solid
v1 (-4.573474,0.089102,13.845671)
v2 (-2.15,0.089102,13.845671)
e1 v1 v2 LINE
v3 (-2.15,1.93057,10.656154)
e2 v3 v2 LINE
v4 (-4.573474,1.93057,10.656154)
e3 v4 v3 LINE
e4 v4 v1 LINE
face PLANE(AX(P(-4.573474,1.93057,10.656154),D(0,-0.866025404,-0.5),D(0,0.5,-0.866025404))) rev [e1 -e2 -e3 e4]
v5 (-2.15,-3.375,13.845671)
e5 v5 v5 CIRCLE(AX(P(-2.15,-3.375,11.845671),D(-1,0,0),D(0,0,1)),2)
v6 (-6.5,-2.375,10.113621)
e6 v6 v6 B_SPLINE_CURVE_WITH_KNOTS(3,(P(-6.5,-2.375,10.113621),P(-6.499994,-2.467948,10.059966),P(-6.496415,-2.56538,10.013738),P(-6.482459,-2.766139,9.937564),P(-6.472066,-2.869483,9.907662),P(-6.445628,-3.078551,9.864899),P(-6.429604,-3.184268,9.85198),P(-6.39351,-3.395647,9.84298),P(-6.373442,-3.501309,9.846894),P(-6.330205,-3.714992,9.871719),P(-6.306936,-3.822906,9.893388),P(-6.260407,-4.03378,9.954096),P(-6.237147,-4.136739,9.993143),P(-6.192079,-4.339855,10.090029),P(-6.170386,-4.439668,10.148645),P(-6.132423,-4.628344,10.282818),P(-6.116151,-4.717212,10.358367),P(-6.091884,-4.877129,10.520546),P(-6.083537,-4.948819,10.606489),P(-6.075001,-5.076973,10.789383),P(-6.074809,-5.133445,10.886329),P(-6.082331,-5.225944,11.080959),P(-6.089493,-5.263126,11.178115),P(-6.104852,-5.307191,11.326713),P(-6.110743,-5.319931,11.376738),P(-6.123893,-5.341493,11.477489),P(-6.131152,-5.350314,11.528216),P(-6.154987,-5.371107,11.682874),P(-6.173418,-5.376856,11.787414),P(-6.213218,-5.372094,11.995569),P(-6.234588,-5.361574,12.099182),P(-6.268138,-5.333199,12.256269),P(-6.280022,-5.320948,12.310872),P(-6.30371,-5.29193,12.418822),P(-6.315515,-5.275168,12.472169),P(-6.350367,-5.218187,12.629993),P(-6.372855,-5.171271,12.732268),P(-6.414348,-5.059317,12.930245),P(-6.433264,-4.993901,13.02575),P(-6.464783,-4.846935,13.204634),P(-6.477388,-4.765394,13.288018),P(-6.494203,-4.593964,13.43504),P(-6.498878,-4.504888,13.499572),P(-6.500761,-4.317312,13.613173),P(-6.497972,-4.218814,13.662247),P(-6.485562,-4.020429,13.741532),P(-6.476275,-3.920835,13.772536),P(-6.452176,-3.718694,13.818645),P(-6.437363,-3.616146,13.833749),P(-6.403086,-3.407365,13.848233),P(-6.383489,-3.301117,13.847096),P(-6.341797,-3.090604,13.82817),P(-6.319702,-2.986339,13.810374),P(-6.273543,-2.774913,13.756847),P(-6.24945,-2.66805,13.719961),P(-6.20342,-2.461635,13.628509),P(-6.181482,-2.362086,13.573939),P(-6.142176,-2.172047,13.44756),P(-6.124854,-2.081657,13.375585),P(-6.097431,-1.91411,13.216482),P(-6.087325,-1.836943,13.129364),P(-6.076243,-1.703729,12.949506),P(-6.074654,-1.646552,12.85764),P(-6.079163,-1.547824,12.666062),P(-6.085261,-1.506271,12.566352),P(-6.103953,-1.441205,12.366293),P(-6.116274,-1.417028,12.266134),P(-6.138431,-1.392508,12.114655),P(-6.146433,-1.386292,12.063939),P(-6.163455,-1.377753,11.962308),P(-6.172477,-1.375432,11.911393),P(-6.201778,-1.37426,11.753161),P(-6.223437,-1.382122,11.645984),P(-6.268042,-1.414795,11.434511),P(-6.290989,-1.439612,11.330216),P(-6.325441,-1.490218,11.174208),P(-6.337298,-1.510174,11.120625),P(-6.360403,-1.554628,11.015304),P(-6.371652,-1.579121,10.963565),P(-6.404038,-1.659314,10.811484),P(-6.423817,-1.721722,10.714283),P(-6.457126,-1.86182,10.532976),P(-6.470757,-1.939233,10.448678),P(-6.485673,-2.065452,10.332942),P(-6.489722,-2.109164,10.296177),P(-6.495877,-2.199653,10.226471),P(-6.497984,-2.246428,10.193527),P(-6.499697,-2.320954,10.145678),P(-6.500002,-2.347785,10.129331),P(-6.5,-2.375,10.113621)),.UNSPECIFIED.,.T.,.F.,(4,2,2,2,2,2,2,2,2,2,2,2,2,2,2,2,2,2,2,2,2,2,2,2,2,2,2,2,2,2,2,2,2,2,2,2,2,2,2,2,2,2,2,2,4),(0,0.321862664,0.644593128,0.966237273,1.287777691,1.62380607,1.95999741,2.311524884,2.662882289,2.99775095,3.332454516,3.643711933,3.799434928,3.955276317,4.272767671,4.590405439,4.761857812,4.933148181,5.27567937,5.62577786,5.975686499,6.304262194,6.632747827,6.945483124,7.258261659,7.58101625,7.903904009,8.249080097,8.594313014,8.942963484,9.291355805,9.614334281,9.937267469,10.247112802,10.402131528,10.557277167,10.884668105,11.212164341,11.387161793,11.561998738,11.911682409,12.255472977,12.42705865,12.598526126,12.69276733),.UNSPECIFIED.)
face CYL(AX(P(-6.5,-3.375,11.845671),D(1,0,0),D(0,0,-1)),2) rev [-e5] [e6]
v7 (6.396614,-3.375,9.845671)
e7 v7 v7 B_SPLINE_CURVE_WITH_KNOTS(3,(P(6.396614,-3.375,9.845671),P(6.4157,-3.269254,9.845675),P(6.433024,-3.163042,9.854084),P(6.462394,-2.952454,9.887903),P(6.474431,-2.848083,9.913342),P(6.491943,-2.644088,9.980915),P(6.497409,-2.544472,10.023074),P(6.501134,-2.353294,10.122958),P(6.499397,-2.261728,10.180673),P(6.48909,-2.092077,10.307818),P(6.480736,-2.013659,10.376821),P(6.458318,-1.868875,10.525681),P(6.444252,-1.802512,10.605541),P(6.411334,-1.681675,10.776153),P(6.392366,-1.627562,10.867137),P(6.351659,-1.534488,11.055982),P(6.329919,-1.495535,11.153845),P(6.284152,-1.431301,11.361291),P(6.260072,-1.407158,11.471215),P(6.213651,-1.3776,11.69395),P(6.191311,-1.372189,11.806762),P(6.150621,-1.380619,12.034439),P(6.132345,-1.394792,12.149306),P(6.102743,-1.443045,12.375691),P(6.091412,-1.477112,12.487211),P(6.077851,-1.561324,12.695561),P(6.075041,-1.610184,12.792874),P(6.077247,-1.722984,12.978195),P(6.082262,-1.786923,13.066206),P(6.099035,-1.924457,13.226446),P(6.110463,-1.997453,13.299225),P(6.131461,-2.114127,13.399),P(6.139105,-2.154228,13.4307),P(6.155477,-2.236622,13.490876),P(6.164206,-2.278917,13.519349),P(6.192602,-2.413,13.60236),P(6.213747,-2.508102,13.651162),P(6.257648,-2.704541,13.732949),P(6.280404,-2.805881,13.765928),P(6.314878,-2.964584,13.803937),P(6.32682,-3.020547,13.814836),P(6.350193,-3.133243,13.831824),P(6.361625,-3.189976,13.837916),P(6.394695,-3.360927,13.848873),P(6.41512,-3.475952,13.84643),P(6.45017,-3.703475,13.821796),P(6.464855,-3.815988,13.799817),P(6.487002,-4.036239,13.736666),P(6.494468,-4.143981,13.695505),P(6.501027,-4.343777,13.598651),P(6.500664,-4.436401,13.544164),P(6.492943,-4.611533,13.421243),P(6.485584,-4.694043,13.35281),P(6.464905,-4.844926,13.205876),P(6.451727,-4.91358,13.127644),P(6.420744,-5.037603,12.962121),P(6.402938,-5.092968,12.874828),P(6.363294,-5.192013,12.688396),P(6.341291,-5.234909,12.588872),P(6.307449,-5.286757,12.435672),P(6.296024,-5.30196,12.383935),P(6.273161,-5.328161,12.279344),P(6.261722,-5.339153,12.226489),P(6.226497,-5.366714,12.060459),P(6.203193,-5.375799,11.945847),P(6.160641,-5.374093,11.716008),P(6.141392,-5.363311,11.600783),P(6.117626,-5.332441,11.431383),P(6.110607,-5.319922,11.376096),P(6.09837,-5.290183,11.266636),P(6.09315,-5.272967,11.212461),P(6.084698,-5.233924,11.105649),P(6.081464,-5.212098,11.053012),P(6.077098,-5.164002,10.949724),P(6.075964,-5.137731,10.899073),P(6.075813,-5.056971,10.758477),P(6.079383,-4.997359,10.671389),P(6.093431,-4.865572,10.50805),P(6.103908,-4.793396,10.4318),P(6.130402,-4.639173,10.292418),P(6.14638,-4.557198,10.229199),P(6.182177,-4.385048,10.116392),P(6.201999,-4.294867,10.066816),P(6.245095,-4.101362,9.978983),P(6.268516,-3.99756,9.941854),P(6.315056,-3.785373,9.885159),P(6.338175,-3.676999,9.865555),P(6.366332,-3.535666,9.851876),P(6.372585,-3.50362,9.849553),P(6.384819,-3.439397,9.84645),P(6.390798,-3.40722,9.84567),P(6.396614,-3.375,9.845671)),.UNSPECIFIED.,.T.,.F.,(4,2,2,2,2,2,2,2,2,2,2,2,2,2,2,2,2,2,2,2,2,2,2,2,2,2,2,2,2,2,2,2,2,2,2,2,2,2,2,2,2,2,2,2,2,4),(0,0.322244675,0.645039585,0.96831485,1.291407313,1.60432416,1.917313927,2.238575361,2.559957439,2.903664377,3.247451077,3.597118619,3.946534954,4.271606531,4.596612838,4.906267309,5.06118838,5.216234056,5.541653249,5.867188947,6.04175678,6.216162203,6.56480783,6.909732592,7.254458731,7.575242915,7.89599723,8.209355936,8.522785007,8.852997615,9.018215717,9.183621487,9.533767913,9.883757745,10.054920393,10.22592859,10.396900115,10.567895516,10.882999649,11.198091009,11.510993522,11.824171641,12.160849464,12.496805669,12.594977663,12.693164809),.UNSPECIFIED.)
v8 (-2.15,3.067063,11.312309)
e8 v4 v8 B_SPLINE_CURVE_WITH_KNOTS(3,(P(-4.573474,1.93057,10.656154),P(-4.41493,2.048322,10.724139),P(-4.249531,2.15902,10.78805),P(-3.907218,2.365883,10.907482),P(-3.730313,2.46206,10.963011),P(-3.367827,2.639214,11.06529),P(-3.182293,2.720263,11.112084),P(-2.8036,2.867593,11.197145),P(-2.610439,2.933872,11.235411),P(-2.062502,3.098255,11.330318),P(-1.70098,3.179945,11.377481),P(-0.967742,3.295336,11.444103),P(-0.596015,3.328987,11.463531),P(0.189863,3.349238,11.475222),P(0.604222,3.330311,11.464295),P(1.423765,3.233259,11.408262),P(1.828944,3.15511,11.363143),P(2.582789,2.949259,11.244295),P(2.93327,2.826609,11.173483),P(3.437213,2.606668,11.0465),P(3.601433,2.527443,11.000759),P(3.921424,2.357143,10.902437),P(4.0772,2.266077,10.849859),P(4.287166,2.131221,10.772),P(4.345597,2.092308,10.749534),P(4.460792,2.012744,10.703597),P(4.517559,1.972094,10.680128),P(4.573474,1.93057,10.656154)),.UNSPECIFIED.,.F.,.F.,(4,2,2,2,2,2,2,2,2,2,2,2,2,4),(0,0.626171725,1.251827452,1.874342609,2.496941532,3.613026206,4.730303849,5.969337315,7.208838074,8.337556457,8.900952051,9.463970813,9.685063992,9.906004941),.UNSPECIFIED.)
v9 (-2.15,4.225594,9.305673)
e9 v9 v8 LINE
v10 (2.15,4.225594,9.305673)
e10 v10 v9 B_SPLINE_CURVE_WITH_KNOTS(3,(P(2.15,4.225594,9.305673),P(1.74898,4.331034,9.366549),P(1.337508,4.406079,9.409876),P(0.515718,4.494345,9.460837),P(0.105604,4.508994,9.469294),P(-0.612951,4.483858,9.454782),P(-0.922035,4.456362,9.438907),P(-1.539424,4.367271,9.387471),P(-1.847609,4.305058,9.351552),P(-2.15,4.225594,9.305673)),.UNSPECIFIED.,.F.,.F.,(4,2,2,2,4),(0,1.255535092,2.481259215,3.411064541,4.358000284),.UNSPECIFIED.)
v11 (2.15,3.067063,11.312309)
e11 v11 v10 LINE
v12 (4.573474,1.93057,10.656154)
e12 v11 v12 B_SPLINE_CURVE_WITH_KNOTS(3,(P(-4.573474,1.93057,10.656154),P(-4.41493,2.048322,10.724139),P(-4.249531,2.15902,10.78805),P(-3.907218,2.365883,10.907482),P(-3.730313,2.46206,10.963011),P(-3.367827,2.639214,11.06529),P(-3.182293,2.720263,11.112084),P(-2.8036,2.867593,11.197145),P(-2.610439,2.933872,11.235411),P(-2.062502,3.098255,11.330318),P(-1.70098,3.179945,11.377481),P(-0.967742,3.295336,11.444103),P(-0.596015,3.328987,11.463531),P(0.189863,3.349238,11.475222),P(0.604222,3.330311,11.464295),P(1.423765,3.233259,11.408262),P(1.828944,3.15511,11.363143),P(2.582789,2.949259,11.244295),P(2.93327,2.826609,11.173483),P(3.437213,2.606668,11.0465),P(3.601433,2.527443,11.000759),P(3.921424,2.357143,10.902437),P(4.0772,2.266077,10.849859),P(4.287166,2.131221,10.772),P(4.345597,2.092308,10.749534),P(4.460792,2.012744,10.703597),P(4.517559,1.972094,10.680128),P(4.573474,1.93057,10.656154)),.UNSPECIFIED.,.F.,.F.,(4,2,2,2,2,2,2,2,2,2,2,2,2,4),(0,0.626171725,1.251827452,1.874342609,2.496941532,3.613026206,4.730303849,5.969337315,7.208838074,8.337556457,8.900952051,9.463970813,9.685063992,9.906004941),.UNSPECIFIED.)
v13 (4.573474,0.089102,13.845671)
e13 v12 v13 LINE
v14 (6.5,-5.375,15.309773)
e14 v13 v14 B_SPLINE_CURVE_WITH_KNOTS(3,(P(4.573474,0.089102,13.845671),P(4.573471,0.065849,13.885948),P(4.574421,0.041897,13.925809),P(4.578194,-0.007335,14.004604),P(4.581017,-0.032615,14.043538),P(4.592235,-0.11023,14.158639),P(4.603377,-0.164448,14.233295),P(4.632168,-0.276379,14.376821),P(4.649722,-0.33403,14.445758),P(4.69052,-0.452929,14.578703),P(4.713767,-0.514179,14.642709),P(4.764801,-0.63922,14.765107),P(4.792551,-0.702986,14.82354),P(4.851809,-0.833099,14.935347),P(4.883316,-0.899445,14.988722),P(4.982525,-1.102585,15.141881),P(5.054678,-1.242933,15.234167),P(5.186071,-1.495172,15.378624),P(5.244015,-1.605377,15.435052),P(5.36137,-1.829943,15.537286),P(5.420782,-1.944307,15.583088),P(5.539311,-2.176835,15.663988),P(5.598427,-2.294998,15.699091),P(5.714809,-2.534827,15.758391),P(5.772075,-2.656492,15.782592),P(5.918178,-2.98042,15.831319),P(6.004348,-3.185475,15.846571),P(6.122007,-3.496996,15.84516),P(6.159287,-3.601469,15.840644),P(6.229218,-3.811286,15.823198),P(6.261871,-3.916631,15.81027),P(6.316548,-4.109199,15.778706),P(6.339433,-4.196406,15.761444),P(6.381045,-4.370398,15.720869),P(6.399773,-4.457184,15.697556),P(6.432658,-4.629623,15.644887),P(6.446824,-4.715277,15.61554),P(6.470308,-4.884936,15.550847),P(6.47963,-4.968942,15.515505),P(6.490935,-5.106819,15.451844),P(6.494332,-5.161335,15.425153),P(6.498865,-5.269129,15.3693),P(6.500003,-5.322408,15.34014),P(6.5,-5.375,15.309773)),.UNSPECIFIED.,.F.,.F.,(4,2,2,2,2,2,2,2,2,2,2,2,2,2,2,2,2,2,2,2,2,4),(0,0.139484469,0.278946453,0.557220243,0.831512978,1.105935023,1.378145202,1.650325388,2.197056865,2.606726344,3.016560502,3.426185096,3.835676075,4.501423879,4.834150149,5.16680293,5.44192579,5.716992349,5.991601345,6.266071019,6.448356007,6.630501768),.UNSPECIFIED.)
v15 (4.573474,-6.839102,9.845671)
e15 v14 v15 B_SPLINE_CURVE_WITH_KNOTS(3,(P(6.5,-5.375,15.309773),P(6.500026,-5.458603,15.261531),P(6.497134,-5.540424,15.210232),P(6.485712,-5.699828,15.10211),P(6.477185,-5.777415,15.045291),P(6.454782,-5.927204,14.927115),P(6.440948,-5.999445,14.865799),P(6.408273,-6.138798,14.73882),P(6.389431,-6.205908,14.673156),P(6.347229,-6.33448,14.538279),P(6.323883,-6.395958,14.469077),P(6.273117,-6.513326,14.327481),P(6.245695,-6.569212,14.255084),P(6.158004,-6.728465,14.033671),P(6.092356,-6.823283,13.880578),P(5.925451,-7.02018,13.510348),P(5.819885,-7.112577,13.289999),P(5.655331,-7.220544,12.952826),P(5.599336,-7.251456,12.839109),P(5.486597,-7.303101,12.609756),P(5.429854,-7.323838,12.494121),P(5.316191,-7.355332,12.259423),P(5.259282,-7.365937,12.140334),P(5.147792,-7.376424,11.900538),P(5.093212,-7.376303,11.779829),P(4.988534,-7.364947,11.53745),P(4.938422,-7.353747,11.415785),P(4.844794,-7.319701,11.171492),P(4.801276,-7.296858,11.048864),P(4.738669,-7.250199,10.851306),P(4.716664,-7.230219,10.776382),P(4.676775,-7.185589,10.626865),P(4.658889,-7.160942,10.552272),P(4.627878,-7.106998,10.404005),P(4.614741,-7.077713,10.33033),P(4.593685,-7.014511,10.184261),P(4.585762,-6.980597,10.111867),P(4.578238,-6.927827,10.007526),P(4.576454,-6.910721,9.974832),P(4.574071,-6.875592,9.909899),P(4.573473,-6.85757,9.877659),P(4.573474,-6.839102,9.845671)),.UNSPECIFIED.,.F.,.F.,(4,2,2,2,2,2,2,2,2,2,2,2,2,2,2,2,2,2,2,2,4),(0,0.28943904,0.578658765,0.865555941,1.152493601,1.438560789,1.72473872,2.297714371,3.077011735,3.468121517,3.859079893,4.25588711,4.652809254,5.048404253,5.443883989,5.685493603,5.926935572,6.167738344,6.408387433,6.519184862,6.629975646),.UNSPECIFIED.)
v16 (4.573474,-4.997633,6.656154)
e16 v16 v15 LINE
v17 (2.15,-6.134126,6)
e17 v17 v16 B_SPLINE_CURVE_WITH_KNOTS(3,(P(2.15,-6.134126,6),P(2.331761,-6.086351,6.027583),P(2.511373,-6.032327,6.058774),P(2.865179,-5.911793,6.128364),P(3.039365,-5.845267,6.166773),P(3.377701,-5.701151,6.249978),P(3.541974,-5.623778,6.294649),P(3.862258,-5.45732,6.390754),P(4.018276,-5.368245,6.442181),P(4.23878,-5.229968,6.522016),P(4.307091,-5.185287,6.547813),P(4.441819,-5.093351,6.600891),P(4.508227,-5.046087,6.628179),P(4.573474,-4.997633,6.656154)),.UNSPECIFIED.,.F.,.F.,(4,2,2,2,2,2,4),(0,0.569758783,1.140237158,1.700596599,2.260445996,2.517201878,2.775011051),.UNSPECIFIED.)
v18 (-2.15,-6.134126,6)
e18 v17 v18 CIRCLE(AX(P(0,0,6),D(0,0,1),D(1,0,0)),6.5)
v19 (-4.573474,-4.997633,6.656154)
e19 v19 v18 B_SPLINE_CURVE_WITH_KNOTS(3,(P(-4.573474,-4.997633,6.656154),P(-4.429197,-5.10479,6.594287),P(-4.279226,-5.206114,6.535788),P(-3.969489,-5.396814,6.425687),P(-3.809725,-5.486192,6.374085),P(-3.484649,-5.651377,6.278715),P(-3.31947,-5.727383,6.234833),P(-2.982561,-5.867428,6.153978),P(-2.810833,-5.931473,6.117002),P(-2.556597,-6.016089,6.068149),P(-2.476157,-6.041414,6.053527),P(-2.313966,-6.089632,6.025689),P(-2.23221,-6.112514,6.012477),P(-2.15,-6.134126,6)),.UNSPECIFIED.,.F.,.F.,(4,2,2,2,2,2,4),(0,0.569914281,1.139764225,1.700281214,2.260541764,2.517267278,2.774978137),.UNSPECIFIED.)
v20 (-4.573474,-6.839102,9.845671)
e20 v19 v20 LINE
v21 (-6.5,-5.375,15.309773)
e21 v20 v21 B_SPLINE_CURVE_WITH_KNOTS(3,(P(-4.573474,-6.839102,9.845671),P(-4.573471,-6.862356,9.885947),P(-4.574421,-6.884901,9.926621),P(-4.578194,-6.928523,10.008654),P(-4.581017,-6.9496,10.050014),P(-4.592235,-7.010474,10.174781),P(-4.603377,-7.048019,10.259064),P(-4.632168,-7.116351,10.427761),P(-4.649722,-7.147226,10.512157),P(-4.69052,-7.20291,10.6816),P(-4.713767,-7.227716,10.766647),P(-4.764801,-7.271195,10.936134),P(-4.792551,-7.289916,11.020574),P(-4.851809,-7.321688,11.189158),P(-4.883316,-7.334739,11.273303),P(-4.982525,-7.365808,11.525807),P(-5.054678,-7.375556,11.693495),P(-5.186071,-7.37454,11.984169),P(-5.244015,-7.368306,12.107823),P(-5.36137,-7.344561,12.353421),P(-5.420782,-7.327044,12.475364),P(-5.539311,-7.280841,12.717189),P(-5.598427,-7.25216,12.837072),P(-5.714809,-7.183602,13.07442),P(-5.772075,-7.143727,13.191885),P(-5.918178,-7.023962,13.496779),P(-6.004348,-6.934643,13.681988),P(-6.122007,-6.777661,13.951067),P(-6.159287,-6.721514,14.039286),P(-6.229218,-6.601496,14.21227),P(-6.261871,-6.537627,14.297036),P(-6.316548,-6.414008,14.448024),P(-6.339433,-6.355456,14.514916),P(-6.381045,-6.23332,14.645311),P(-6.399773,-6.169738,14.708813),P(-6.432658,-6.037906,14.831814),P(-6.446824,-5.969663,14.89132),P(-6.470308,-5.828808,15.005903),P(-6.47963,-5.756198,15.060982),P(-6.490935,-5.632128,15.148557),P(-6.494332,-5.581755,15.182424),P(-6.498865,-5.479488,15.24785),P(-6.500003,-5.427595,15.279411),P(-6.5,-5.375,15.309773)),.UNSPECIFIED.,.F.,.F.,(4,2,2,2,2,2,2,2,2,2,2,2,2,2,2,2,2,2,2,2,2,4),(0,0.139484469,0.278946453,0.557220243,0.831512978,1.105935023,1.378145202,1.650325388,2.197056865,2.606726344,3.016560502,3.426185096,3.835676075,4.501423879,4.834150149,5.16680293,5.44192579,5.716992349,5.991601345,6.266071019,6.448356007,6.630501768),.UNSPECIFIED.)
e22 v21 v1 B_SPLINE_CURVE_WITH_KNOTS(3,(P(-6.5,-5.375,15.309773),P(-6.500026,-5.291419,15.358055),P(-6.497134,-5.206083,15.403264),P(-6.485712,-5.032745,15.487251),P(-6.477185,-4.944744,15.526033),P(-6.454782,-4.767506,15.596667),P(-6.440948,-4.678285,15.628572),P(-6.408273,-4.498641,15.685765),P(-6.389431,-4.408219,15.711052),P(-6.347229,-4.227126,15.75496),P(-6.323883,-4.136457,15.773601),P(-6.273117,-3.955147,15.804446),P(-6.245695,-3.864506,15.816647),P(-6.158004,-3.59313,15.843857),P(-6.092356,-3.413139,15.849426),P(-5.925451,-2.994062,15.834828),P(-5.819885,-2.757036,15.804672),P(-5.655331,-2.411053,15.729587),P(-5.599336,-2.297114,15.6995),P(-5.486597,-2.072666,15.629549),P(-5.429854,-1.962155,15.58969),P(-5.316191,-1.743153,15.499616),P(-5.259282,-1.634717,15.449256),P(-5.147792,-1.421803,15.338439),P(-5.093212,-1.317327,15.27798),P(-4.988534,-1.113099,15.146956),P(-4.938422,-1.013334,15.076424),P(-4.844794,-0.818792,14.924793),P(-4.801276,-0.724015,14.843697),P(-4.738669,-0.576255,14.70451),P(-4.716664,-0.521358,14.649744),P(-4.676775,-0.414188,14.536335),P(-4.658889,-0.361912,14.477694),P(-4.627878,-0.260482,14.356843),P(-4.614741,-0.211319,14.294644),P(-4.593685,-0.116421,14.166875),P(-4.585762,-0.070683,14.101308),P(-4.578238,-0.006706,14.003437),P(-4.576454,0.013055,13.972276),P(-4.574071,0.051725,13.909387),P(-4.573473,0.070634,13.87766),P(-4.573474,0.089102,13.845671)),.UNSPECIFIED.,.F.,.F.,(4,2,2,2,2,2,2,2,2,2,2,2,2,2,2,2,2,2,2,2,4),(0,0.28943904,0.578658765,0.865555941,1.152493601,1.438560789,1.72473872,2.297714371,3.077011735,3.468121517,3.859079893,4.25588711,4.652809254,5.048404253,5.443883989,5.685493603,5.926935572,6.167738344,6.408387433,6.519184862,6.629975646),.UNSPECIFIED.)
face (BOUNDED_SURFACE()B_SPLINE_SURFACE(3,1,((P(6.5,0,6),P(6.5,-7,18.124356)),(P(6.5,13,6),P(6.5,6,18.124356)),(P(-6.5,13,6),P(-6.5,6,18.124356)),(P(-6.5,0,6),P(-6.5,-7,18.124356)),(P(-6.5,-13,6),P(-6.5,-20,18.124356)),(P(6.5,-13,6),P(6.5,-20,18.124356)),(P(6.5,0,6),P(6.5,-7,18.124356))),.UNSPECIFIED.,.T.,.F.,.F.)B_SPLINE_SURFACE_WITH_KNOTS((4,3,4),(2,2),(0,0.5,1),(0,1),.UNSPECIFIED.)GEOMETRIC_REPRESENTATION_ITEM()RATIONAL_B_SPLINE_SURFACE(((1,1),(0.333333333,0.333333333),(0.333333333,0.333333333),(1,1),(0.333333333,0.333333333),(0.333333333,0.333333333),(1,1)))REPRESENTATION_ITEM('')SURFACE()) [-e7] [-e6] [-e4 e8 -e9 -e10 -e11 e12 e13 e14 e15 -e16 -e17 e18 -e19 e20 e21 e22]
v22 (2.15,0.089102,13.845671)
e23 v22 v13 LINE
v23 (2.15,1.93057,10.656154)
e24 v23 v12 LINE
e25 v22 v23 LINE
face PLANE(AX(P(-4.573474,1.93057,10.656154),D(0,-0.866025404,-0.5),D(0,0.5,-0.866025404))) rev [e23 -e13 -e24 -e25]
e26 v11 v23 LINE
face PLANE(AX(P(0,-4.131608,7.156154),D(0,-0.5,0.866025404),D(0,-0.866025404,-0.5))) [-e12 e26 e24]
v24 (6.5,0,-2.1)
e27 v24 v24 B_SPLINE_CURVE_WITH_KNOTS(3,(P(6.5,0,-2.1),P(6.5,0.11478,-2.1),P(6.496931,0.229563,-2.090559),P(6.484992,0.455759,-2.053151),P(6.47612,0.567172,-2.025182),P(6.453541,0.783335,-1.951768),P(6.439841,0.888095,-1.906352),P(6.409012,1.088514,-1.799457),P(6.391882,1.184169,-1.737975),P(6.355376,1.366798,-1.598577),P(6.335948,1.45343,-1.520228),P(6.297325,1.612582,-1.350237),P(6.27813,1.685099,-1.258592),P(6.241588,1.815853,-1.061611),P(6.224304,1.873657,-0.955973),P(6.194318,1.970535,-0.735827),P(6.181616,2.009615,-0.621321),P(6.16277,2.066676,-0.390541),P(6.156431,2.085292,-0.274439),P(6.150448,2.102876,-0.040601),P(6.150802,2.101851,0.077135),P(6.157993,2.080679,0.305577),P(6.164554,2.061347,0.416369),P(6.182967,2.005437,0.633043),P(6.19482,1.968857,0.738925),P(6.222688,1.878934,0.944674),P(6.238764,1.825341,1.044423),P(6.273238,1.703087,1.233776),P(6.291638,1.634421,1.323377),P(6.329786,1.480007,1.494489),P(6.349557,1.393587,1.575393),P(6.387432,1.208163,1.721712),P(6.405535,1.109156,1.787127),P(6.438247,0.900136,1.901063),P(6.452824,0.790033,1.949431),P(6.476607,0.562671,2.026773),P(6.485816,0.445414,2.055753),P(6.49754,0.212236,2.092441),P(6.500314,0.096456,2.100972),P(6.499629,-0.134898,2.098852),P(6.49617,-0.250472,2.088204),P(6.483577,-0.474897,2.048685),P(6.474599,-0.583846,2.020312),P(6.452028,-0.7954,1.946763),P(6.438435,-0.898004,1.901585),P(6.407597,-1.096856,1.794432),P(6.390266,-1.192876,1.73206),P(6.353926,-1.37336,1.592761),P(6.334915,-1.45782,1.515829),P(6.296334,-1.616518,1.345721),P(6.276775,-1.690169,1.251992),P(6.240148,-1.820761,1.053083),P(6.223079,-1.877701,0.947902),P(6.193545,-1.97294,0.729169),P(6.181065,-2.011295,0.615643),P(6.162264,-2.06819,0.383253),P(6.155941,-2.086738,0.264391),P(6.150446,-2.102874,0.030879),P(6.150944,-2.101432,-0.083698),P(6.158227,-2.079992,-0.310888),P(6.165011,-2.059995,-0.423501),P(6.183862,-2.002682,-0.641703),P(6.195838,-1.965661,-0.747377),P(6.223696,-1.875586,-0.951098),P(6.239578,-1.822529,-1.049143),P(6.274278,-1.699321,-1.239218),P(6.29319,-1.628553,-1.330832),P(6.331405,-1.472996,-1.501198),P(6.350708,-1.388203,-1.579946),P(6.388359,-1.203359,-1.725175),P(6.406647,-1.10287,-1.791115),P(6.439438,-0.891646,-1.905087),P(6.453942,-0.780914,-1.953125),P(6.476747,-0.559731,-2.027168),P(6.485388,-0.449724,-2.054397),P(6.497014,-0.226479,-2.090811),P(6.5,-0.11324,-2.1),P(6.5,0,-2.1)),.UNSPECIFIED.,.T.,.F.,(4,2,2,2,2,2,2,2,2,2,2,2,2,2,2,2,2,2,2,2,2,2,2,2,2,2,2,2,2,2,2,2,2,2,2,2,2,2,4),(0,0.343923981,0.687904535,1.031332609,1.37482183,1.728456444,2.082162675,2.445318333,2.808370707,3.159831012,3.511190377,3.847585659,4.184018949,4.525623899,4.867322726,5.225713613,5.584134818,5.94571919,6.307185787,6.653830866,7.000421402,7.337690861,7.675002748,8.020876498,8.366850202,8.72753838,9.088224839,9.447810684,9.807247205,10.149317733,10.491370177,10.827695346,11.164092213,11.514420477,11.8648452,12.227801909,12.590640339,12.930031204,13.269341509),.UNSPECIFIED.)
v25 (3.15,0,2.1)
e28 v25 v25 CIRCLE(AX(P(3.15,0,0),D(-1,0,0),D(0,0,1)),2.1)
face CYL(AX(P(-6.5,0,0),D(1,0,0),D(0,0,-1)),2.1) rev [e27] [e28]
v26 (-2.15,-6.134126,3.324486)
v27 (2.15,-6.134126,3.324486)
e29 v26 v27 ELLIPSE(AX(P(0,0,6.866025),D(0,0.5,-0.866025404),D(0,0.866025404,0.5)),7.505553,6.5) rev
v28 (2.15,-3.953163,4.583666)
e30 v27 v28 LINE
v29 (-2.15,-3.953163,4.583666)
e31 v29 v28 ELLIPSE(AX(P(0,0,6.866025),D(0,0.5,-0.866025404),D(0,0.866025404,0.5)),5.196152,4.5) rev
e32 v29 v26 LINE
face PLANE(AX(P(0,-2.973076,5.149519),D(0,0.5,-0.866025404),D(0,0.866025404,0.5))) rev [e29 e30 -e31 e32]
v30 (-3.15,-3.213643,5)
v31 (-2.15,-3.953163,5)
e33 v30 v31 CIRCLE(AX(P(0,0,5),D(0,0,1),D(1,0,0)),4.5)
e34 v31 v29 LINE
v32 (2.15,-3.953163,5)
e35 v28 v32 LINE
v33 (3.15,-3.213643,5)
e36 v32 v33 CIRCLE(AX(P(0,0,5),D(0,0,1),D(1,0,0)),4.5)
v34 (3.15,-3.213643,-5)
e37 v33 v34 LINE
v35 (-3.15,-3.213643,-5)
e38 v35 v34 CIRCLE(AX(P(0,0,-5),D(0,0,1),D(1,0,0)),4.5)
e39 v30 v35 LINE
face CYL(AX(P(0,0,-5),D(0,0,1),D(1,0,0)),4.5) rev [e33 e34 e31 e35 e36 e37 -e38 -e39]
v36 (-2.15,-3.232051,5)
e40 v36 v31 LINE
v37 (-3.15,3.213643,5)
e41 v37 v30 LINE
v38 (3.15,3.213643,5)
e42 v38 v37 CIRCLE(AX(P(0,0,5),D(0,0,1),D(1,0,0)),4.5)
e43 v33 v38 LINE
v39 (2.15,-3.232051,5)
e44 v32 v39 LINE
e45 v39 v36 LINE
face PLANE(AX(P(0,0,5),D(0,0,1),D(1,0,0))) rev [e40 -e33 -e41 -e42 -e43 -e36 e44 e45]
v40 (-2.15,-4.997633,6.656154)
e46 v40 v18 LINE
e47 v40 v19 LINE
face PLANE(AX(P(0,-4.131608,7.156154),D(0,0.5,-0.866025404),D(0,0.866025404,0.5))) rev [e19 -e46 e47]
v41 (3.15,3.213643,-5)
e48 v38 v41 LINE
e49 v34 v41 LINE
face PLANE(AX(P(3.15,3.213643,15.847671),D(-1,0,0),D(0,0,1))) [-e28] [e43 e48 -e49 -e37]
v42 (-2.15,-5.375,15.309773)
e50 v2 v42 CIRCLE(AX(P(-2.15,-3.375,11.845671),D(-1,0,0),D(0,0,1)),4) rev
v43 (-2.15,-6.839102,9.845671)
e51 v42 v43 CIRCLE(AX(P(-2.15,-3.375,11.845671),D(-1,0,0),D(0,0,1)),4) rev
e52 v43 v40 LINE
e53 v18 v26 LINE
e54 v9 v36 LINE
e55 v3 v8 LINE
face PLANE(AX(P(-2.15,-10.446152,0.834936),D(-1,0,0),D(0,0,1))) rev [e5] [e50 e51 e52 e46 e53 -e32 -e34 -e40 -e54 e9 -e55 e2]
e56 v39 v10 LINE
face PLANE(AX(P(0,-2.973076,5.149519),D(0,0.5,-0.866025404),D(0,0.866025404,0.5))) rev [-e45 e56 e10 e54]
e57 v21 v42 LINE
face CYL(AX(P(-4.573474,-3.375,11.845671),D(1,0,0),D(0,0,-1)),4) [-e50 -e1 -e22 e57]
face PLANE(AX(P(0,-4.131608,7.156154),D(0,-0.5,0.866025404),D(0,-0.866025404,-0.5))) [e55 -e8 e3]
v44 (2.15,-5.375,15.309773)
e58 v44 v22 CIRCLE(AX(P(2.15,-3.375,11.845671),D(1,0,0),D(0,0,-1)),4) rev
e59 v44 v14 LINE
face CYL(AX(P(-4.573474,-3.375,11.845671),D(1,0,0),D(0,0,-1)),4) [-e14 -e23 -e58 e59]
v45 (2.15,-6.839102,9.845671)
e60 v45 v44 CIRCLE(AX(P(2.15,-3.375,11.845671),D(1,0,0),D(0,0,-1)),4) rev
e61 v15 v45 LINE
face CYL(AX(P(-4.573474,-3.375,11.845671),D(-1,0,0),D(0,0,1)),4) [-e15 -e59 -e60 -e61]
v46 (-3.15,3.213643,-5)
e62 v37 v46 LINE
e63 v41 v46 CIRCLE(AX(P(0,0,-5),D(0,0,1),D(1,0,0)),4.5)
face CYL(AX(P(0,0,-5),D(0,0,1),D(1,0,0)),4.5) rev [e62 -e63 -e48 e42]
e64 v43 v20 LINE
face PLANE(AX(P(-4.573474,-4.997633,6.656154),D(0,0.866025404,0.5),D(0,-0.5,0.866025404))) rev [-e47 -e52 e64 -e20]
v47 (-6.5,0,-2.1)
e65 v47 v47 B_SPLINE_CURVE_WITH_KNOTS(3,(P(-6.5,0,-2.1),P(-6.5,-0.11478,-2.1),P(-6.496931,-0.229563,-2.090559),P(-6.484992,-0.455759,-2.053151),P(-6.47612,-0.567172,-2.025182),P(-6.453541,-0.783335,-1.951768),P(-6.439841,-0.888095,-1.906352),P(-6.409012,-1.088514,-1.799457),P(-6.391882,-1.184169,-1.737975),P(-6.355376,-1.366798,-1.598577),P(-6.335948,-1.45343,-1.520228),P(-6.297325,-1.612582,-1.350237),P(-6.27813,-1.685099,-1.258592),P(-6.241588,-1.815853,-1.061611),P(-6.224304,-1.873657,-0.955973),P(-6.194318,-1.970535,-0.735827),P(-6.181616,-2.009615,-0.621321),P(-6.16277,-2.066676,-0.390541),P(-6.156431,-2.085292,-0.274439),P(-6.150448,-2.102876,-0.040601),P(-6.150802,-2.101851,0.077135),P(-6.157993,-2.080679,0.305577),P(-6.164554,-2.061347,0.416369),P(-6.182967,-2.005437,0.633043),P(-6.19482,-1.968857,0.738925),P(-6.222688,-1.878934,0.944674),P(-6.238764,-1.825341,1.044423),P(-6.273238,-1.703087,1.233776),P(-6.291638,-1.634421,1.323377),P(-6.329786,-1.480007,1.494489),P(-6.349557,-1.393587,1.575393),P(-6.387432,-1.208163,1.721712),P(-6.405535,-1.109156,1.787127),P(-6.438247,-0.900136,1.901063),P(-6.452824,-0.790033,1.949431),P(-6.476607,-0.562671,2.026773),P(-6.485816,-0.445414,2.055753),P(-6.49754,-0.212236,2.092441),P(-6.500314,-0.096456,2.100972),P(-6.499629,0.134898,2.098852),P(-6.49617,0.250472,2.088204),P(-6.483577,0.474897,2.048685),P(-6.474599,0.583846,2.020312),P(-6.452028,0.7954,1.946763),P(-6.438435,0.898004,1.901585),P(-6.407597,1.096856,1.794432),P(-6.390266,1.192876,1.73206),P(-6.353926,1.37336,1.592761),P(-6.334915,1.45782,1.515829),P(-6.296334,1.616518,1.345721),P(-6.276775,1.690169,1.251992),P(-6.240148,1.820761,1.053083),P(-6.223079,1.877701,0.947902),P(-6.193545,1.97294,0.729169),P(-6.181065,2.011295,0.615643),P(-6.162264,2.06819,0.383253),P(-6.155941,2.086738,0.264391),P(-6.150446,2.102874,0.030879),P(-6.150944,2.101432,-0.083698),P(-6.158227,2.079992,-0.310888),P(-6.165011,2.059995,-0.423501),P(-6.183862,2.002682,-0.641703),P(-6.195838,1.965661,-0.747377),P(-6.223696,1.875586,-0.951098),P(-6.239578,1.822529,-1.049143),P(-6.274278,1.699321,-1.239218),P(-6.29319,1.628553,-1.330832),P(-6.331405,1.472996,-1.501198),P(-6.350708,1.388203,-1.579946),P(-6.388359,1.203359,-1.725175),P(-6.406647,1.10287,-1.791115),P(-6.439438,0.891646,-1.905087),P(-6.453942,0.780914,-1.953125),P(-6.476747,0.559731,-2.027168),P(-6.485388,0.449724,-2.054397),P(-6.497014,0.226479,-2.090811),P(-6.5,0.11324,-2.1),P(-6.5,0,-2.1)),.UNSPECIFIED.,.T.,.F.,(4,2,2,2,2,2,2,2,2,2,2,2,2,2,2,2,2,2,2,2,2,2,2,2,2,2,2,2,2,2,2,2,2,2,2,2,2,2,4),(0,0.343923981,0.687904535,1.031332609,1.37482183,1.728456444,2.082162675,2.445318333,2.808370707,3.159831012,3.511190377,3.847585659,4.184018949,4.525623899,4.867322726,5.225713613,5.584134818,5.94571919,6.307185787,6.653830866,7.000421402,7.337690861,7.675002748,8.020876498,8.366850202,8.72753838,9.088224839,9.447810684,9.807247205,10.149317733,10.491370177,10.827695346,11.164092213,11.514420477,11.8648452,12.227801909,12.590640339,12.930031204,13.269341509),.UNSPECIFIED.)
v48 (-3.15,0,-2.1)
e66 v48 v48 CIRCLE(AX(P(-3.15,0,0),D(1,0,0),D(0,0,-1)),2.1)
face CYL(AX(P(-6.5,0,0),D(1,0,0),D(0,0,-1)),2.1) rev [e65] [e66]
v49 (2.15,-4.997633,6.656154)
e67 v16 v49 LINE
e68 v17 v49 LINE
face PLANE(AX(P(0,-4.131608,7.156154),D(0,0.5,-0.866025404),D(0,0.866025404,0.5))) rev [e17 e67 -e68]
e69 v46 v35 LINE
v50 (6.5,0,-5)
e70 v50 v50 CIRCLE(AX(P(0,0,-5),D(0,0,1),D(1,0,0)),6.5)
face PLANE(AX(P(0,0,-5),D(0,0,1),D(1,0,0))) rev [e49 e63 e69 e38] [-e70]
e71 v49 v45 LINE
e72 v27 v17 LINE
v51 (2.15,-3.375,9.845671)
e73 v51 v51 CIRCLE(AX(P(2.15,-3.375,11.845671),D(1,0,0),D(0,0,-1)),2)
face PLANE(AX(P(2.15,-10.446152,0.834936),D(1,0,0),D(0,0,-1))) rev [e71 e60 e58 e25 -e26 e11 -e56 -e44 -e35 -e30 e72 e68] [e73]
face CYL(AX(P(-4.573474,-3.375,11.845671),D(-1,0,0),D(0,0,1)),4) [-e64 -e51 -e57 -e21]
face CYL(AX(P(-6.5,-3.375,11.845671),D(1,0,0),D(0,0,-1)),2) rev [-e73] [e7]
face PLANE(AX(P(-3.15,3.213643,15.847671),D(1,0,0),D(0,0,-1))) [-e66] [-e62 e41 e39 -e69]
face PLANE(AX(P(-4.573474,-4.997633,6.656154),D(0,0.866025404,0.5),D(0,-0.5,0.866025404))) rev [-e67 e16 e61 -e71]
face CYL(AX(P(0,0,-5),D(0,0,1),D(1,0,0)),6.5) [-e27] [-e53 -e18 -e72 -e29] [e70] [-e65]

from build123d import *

# Parameters (mm, degrees)
BOSS_EXTRUDE1_DEPTH      = 5
BOSS_EXTRUDE1_DEPTH_BACK = 5
SKETCH1_R                = 6.5
SKETCH1_R_2              = 4.5
SKETCH2_R                = 6.5
BOSS_EXTRUDE2_DEPTH      = 1
CUT_EXTRUDE1_START       = -8
CUT_EXTRUDE1_DEPTH       = 15
SKETCH6_W                = 4.3
SKETCH6_H                = 17.25833025
CUT_EXTRUDE2_DEPTH       = 10
CUT_EXTRUDE3_DEPTH       = 22.553121401
CUT_EXTRUDE3_DEPTH_BACK  = 22.553121401
SKETCH7_R                = 2
SKETCH8_W                = 9.14694849
SKETCH8_H                = 3.258330249
CUT_EXTRUDE4_DEPTH       = 7.682935
FILLET2_R                = 4
BOSS_EXTRUDE4_REACH      = 25.047
CUT_EXTRUDE5_DEPTH       = 19.647410958
CUT_EXTRUDE5_DEPTH_BACK  = 19.647410958
SKETCH10_R               = 2.1


with BuildPart() as part:
    # Sketch1 → Boss-Extrude1 (new, two sides: drawn at the far end of the back side and taken through both)
    with BuildSketch(Plane.XY.offset(-BOSS_EXTRUDE1_DEPTH_BACK)):
        Circle(SKETCH1_R)
        Circle(SKETCH1_R_2, mode=Mode.SUBTRACT)
    extrude(amount=BOSS_EXTRUDE1_DEPTH + BOSS_EXTRUDE1_DEPTH_BACK)

    # Sketch2 → Boss-Extrude2 (add)
    with BuildSketch(Plane.XY.offset(5)):
        Circle(SKETCH2_R)
    extrude(amount=BOSS_EXTRUDE2_DEPTH)

    # Sweep1: read off the stored shape, not the designer's step
    # Sweep1: loft between two sections, ruled curve by curve
    sweep1_from = [
        Edge.make_bspline([(6.5, 0, 6), (6.5, 13, 6), (-6.5, 13, 6), (-6.5, 0, 6), (-6.5, -13, 6), (6.5, -13, 6), (6.5, 0, 6)], [0, 0, 0, 0, 0.5, 0.5, 0.5, 1, 1, 1, 1], 3, [1, 0.333333333, 0.333333333, 1, 0.333333333, 0.333333333, 1]),
    ]
    sweep1_to = [
        Edge.make_bspline([(6.5, -7, 18.124355653), (6.5, 6, 18.124355653), (-6.5, 6, 18.124355653), (-6.5, -7, 18.124355653), (-6.5, -20, 18.124355653), (6.5, -20, 18.124355653), (6.5, -7, 18.124355653)], [0, 0, 0, 0, 0.5, 0.5, 0.5, 1, 1, 1, 1], 3, [1, 0.333333333, 0.333333333, 1, 0.333333333, 0.333333333, 1]),
    ]
    sweep1 = Solid(Shell([*[Face.make_surface_from_curves(sweep1_from[k], sweep1_to[k]) for k in range(1)], Face(Wire(sweep1_from)), Face(Wire(sweep1_to))]))
    add(sweep1)

    # Cut-Extrude1: read off the stored shape, not the designer's step
    # Cut-Extrude1 outline → Cut-Extrude1 (cut)
    with BuildSketch(Plane(origin=(0, 0, 0), x_dir=(0, 0, -1), z_dir=(1, 0, 0)).offset(CUT_EXTRUDE1_START)):
        Polygon((-12.495190528, -10.25), (-18.124355653, -0.5), (-18.124355653, -13.5), align=None)
    extrude(amount=CUT_EXTRUDE1_DEPTH, mode=Mode.SUBTRACT)

    # Sketch6 → Cut-Extrude2 (cut)
    with BuildSketch(Plane(origin=(0, -7.973076211, 13.809773091), x_dir=(1, 0, 0), z_dir=(0, -0.5000000000000006, 0.8660254037844384))):
        Rectangle(SKETCH6_W, SKETCH6_H)
    extrude(amount=-CUT_EXTRUDE2_DEPTH, mode=Mode.SUBTRACT)

    # Sketch7 → Cut-Extrude3 (cut, two sides: drawn at the far end of the back side and taken through both)
    with BuildSketch(Plane(origin=(0, 0, 0), x_dir=(0, 0, -1), z_dir=(1, 0, 0)).offset(-CUT_EXTRUDE3_DEPTH_BACK)):
        with Locations(Location((-11.845671476, -3.375, 0), (0, 0, 30))):
            Circle(SKETCH7_R)
    extrude(amount=CUT_EXTRUDE3_DEPTH + CUT_EXTRUDE3_DEPTH_BACK, mode=Mode.SUBTRACT)

    # Sketch8 → Cut-Extrude4 (cut)
    with BuildSketch(Plane(origin=(0, -7.973076211, 13.809773091), x_dir=(1, 0, 0), z_dir=(0, -0.5000000000000004, 0.8660254037844384))):
        with Locations((0, 8.629165125)):
            Rectangle(SKETCH8_W, SKETCH8_H)
        with Locations((0, -2.629165125)):
            Rectangle(SKETCH8_W, SKETCH8_H)
    extrude(amount=-CUT_EXTRUDE4_DEPTH, mode=Mode.SUBTRACT)

    # Fillet2
    # the kernel refuses this fillet: 4 mm, written as the material it takes off along each edge
    with BuildSketch(Plane(origin=(14.573474245, -1.910898385, 17.309773091), x_dir=(0, -0.8660254037646593, -0.5000000000342589), z_dir=(-1, 0, 0)), Plane(origin=(7.85, -1.910898385, 17.309773091), x_dir=(0, -0.8660254037646593, -0.5000000000342589), z_dir=(-1, 0, 0)), Plane(origin=(14.573474245, -8.839101615, 13.309773091), x_dir=(0, 0.5000000000000003, -0.8660254037844386), z_dir=(-1, 0, 0))) as fillet2_piece_1:
        with BuildLine():
            CenterArc((FILLET2_R, -FILLET2_R), FILLET2_R, 90, 90.000000002)
            Line((FILLET2_R * 3.95581923922e-11, -FILLET2_R), (0, 0))
            Line((0, 0), (FILLET2_R, 0))
        make_face()
    extrude(amount=22.423474245, mode=Mode.SUBTRACT)
    with BuildSketch(Plane(origin=(7.85, -8.839101615, 13.309773091), x_dir=(0, 0.8660254038042173, 0.49999999996574257), z_dir=(-1, 0, 0))) as fillet2_piece_2:
        with BuildLine():
            CenterArc((FILLET2_R, FILLET2_R), FILLET2_R, 179.999999998, 89.999999998)
            Line((FILLET2_R * 3.95576715485e-11, FILLET2_R), (0, 0))
            Line((0, 0), (FILLET2_R, 0))
        make_face()
    extrude(amount=22.423474245, mode=Mode.SUBTRACT)

    # Sketch9 → Boss-Extrude4 (add, up to next)
    with BuildSketch(Plane(origin=(0, 0, -5), x_dir=(-1, 0, 0), z_dir=(0, 0, -1)), mode=Mode.PRIVATE) as boss_extrude4_sk1:
        with BuildLine():
            Line((-3.15, 3.213642793), (-3.15, -3.213642793))
            ThreePointArc((-3.15, -3.213642793), (-4.5, 0), (-3.15, 3.213642793))
        make_face()
    boss_extrude4_tool1 = extrude(boss_extrude4_sk1.sketch, amount=-BOSS_EXTRUDE4_REACH, mode=Mode.PRIVATE) - part.part
    # Sketch9 → Boss-Extrude4 (add, up to next)
    with BuildSketch(Plane(origin=(0, 0, -5), x_dir=(-1, 0, 0), z_dir=(0, 0, -1)), mode=Mode.PRIVATE) as boss_extrude4_sk2:
        with BuildLine():
            Line((3.15, 3.213642793), (3.15, -3.213642793))
            ThreePointArc((3.15, -3.213642793), (4.5, 0), (3.15, 3.213642793))
        make_face()
    boss_extrude4_tool2 = extrude(boss_extrude4_sk2.sketch, amount=-BOSS_EXTRUDE4_REACH, mode=Mode.PRIVATE) - part.part
    add(boss_extrude4_tool1.solids().sort_by_distance((3.697607, 0, -5))[0])
    add(boss_extrude4_tool2.solids().sort_by_distance((-3.697607, 0, -5))[0])

    # Sketch10 → Cut-Extrude5 (cut, two sides: drawn at the far end of the back side and taken through both)
    with BuildSketch(Plane(origin=(0, 0, 0), x_dir=(0, 0, -1), z_dir=(1, 0, 0)).offset(-CUT_EXTRUDE5_DEPTH_BACK)):
        Circle(SKETCH10_R)
    extrude(amount=CUT_EXTRUDE5_DEPTH + CUT_EXTRUDE5_DEPTH_BACK, mode=Mode.SUBTRACT)


solid = part.part
